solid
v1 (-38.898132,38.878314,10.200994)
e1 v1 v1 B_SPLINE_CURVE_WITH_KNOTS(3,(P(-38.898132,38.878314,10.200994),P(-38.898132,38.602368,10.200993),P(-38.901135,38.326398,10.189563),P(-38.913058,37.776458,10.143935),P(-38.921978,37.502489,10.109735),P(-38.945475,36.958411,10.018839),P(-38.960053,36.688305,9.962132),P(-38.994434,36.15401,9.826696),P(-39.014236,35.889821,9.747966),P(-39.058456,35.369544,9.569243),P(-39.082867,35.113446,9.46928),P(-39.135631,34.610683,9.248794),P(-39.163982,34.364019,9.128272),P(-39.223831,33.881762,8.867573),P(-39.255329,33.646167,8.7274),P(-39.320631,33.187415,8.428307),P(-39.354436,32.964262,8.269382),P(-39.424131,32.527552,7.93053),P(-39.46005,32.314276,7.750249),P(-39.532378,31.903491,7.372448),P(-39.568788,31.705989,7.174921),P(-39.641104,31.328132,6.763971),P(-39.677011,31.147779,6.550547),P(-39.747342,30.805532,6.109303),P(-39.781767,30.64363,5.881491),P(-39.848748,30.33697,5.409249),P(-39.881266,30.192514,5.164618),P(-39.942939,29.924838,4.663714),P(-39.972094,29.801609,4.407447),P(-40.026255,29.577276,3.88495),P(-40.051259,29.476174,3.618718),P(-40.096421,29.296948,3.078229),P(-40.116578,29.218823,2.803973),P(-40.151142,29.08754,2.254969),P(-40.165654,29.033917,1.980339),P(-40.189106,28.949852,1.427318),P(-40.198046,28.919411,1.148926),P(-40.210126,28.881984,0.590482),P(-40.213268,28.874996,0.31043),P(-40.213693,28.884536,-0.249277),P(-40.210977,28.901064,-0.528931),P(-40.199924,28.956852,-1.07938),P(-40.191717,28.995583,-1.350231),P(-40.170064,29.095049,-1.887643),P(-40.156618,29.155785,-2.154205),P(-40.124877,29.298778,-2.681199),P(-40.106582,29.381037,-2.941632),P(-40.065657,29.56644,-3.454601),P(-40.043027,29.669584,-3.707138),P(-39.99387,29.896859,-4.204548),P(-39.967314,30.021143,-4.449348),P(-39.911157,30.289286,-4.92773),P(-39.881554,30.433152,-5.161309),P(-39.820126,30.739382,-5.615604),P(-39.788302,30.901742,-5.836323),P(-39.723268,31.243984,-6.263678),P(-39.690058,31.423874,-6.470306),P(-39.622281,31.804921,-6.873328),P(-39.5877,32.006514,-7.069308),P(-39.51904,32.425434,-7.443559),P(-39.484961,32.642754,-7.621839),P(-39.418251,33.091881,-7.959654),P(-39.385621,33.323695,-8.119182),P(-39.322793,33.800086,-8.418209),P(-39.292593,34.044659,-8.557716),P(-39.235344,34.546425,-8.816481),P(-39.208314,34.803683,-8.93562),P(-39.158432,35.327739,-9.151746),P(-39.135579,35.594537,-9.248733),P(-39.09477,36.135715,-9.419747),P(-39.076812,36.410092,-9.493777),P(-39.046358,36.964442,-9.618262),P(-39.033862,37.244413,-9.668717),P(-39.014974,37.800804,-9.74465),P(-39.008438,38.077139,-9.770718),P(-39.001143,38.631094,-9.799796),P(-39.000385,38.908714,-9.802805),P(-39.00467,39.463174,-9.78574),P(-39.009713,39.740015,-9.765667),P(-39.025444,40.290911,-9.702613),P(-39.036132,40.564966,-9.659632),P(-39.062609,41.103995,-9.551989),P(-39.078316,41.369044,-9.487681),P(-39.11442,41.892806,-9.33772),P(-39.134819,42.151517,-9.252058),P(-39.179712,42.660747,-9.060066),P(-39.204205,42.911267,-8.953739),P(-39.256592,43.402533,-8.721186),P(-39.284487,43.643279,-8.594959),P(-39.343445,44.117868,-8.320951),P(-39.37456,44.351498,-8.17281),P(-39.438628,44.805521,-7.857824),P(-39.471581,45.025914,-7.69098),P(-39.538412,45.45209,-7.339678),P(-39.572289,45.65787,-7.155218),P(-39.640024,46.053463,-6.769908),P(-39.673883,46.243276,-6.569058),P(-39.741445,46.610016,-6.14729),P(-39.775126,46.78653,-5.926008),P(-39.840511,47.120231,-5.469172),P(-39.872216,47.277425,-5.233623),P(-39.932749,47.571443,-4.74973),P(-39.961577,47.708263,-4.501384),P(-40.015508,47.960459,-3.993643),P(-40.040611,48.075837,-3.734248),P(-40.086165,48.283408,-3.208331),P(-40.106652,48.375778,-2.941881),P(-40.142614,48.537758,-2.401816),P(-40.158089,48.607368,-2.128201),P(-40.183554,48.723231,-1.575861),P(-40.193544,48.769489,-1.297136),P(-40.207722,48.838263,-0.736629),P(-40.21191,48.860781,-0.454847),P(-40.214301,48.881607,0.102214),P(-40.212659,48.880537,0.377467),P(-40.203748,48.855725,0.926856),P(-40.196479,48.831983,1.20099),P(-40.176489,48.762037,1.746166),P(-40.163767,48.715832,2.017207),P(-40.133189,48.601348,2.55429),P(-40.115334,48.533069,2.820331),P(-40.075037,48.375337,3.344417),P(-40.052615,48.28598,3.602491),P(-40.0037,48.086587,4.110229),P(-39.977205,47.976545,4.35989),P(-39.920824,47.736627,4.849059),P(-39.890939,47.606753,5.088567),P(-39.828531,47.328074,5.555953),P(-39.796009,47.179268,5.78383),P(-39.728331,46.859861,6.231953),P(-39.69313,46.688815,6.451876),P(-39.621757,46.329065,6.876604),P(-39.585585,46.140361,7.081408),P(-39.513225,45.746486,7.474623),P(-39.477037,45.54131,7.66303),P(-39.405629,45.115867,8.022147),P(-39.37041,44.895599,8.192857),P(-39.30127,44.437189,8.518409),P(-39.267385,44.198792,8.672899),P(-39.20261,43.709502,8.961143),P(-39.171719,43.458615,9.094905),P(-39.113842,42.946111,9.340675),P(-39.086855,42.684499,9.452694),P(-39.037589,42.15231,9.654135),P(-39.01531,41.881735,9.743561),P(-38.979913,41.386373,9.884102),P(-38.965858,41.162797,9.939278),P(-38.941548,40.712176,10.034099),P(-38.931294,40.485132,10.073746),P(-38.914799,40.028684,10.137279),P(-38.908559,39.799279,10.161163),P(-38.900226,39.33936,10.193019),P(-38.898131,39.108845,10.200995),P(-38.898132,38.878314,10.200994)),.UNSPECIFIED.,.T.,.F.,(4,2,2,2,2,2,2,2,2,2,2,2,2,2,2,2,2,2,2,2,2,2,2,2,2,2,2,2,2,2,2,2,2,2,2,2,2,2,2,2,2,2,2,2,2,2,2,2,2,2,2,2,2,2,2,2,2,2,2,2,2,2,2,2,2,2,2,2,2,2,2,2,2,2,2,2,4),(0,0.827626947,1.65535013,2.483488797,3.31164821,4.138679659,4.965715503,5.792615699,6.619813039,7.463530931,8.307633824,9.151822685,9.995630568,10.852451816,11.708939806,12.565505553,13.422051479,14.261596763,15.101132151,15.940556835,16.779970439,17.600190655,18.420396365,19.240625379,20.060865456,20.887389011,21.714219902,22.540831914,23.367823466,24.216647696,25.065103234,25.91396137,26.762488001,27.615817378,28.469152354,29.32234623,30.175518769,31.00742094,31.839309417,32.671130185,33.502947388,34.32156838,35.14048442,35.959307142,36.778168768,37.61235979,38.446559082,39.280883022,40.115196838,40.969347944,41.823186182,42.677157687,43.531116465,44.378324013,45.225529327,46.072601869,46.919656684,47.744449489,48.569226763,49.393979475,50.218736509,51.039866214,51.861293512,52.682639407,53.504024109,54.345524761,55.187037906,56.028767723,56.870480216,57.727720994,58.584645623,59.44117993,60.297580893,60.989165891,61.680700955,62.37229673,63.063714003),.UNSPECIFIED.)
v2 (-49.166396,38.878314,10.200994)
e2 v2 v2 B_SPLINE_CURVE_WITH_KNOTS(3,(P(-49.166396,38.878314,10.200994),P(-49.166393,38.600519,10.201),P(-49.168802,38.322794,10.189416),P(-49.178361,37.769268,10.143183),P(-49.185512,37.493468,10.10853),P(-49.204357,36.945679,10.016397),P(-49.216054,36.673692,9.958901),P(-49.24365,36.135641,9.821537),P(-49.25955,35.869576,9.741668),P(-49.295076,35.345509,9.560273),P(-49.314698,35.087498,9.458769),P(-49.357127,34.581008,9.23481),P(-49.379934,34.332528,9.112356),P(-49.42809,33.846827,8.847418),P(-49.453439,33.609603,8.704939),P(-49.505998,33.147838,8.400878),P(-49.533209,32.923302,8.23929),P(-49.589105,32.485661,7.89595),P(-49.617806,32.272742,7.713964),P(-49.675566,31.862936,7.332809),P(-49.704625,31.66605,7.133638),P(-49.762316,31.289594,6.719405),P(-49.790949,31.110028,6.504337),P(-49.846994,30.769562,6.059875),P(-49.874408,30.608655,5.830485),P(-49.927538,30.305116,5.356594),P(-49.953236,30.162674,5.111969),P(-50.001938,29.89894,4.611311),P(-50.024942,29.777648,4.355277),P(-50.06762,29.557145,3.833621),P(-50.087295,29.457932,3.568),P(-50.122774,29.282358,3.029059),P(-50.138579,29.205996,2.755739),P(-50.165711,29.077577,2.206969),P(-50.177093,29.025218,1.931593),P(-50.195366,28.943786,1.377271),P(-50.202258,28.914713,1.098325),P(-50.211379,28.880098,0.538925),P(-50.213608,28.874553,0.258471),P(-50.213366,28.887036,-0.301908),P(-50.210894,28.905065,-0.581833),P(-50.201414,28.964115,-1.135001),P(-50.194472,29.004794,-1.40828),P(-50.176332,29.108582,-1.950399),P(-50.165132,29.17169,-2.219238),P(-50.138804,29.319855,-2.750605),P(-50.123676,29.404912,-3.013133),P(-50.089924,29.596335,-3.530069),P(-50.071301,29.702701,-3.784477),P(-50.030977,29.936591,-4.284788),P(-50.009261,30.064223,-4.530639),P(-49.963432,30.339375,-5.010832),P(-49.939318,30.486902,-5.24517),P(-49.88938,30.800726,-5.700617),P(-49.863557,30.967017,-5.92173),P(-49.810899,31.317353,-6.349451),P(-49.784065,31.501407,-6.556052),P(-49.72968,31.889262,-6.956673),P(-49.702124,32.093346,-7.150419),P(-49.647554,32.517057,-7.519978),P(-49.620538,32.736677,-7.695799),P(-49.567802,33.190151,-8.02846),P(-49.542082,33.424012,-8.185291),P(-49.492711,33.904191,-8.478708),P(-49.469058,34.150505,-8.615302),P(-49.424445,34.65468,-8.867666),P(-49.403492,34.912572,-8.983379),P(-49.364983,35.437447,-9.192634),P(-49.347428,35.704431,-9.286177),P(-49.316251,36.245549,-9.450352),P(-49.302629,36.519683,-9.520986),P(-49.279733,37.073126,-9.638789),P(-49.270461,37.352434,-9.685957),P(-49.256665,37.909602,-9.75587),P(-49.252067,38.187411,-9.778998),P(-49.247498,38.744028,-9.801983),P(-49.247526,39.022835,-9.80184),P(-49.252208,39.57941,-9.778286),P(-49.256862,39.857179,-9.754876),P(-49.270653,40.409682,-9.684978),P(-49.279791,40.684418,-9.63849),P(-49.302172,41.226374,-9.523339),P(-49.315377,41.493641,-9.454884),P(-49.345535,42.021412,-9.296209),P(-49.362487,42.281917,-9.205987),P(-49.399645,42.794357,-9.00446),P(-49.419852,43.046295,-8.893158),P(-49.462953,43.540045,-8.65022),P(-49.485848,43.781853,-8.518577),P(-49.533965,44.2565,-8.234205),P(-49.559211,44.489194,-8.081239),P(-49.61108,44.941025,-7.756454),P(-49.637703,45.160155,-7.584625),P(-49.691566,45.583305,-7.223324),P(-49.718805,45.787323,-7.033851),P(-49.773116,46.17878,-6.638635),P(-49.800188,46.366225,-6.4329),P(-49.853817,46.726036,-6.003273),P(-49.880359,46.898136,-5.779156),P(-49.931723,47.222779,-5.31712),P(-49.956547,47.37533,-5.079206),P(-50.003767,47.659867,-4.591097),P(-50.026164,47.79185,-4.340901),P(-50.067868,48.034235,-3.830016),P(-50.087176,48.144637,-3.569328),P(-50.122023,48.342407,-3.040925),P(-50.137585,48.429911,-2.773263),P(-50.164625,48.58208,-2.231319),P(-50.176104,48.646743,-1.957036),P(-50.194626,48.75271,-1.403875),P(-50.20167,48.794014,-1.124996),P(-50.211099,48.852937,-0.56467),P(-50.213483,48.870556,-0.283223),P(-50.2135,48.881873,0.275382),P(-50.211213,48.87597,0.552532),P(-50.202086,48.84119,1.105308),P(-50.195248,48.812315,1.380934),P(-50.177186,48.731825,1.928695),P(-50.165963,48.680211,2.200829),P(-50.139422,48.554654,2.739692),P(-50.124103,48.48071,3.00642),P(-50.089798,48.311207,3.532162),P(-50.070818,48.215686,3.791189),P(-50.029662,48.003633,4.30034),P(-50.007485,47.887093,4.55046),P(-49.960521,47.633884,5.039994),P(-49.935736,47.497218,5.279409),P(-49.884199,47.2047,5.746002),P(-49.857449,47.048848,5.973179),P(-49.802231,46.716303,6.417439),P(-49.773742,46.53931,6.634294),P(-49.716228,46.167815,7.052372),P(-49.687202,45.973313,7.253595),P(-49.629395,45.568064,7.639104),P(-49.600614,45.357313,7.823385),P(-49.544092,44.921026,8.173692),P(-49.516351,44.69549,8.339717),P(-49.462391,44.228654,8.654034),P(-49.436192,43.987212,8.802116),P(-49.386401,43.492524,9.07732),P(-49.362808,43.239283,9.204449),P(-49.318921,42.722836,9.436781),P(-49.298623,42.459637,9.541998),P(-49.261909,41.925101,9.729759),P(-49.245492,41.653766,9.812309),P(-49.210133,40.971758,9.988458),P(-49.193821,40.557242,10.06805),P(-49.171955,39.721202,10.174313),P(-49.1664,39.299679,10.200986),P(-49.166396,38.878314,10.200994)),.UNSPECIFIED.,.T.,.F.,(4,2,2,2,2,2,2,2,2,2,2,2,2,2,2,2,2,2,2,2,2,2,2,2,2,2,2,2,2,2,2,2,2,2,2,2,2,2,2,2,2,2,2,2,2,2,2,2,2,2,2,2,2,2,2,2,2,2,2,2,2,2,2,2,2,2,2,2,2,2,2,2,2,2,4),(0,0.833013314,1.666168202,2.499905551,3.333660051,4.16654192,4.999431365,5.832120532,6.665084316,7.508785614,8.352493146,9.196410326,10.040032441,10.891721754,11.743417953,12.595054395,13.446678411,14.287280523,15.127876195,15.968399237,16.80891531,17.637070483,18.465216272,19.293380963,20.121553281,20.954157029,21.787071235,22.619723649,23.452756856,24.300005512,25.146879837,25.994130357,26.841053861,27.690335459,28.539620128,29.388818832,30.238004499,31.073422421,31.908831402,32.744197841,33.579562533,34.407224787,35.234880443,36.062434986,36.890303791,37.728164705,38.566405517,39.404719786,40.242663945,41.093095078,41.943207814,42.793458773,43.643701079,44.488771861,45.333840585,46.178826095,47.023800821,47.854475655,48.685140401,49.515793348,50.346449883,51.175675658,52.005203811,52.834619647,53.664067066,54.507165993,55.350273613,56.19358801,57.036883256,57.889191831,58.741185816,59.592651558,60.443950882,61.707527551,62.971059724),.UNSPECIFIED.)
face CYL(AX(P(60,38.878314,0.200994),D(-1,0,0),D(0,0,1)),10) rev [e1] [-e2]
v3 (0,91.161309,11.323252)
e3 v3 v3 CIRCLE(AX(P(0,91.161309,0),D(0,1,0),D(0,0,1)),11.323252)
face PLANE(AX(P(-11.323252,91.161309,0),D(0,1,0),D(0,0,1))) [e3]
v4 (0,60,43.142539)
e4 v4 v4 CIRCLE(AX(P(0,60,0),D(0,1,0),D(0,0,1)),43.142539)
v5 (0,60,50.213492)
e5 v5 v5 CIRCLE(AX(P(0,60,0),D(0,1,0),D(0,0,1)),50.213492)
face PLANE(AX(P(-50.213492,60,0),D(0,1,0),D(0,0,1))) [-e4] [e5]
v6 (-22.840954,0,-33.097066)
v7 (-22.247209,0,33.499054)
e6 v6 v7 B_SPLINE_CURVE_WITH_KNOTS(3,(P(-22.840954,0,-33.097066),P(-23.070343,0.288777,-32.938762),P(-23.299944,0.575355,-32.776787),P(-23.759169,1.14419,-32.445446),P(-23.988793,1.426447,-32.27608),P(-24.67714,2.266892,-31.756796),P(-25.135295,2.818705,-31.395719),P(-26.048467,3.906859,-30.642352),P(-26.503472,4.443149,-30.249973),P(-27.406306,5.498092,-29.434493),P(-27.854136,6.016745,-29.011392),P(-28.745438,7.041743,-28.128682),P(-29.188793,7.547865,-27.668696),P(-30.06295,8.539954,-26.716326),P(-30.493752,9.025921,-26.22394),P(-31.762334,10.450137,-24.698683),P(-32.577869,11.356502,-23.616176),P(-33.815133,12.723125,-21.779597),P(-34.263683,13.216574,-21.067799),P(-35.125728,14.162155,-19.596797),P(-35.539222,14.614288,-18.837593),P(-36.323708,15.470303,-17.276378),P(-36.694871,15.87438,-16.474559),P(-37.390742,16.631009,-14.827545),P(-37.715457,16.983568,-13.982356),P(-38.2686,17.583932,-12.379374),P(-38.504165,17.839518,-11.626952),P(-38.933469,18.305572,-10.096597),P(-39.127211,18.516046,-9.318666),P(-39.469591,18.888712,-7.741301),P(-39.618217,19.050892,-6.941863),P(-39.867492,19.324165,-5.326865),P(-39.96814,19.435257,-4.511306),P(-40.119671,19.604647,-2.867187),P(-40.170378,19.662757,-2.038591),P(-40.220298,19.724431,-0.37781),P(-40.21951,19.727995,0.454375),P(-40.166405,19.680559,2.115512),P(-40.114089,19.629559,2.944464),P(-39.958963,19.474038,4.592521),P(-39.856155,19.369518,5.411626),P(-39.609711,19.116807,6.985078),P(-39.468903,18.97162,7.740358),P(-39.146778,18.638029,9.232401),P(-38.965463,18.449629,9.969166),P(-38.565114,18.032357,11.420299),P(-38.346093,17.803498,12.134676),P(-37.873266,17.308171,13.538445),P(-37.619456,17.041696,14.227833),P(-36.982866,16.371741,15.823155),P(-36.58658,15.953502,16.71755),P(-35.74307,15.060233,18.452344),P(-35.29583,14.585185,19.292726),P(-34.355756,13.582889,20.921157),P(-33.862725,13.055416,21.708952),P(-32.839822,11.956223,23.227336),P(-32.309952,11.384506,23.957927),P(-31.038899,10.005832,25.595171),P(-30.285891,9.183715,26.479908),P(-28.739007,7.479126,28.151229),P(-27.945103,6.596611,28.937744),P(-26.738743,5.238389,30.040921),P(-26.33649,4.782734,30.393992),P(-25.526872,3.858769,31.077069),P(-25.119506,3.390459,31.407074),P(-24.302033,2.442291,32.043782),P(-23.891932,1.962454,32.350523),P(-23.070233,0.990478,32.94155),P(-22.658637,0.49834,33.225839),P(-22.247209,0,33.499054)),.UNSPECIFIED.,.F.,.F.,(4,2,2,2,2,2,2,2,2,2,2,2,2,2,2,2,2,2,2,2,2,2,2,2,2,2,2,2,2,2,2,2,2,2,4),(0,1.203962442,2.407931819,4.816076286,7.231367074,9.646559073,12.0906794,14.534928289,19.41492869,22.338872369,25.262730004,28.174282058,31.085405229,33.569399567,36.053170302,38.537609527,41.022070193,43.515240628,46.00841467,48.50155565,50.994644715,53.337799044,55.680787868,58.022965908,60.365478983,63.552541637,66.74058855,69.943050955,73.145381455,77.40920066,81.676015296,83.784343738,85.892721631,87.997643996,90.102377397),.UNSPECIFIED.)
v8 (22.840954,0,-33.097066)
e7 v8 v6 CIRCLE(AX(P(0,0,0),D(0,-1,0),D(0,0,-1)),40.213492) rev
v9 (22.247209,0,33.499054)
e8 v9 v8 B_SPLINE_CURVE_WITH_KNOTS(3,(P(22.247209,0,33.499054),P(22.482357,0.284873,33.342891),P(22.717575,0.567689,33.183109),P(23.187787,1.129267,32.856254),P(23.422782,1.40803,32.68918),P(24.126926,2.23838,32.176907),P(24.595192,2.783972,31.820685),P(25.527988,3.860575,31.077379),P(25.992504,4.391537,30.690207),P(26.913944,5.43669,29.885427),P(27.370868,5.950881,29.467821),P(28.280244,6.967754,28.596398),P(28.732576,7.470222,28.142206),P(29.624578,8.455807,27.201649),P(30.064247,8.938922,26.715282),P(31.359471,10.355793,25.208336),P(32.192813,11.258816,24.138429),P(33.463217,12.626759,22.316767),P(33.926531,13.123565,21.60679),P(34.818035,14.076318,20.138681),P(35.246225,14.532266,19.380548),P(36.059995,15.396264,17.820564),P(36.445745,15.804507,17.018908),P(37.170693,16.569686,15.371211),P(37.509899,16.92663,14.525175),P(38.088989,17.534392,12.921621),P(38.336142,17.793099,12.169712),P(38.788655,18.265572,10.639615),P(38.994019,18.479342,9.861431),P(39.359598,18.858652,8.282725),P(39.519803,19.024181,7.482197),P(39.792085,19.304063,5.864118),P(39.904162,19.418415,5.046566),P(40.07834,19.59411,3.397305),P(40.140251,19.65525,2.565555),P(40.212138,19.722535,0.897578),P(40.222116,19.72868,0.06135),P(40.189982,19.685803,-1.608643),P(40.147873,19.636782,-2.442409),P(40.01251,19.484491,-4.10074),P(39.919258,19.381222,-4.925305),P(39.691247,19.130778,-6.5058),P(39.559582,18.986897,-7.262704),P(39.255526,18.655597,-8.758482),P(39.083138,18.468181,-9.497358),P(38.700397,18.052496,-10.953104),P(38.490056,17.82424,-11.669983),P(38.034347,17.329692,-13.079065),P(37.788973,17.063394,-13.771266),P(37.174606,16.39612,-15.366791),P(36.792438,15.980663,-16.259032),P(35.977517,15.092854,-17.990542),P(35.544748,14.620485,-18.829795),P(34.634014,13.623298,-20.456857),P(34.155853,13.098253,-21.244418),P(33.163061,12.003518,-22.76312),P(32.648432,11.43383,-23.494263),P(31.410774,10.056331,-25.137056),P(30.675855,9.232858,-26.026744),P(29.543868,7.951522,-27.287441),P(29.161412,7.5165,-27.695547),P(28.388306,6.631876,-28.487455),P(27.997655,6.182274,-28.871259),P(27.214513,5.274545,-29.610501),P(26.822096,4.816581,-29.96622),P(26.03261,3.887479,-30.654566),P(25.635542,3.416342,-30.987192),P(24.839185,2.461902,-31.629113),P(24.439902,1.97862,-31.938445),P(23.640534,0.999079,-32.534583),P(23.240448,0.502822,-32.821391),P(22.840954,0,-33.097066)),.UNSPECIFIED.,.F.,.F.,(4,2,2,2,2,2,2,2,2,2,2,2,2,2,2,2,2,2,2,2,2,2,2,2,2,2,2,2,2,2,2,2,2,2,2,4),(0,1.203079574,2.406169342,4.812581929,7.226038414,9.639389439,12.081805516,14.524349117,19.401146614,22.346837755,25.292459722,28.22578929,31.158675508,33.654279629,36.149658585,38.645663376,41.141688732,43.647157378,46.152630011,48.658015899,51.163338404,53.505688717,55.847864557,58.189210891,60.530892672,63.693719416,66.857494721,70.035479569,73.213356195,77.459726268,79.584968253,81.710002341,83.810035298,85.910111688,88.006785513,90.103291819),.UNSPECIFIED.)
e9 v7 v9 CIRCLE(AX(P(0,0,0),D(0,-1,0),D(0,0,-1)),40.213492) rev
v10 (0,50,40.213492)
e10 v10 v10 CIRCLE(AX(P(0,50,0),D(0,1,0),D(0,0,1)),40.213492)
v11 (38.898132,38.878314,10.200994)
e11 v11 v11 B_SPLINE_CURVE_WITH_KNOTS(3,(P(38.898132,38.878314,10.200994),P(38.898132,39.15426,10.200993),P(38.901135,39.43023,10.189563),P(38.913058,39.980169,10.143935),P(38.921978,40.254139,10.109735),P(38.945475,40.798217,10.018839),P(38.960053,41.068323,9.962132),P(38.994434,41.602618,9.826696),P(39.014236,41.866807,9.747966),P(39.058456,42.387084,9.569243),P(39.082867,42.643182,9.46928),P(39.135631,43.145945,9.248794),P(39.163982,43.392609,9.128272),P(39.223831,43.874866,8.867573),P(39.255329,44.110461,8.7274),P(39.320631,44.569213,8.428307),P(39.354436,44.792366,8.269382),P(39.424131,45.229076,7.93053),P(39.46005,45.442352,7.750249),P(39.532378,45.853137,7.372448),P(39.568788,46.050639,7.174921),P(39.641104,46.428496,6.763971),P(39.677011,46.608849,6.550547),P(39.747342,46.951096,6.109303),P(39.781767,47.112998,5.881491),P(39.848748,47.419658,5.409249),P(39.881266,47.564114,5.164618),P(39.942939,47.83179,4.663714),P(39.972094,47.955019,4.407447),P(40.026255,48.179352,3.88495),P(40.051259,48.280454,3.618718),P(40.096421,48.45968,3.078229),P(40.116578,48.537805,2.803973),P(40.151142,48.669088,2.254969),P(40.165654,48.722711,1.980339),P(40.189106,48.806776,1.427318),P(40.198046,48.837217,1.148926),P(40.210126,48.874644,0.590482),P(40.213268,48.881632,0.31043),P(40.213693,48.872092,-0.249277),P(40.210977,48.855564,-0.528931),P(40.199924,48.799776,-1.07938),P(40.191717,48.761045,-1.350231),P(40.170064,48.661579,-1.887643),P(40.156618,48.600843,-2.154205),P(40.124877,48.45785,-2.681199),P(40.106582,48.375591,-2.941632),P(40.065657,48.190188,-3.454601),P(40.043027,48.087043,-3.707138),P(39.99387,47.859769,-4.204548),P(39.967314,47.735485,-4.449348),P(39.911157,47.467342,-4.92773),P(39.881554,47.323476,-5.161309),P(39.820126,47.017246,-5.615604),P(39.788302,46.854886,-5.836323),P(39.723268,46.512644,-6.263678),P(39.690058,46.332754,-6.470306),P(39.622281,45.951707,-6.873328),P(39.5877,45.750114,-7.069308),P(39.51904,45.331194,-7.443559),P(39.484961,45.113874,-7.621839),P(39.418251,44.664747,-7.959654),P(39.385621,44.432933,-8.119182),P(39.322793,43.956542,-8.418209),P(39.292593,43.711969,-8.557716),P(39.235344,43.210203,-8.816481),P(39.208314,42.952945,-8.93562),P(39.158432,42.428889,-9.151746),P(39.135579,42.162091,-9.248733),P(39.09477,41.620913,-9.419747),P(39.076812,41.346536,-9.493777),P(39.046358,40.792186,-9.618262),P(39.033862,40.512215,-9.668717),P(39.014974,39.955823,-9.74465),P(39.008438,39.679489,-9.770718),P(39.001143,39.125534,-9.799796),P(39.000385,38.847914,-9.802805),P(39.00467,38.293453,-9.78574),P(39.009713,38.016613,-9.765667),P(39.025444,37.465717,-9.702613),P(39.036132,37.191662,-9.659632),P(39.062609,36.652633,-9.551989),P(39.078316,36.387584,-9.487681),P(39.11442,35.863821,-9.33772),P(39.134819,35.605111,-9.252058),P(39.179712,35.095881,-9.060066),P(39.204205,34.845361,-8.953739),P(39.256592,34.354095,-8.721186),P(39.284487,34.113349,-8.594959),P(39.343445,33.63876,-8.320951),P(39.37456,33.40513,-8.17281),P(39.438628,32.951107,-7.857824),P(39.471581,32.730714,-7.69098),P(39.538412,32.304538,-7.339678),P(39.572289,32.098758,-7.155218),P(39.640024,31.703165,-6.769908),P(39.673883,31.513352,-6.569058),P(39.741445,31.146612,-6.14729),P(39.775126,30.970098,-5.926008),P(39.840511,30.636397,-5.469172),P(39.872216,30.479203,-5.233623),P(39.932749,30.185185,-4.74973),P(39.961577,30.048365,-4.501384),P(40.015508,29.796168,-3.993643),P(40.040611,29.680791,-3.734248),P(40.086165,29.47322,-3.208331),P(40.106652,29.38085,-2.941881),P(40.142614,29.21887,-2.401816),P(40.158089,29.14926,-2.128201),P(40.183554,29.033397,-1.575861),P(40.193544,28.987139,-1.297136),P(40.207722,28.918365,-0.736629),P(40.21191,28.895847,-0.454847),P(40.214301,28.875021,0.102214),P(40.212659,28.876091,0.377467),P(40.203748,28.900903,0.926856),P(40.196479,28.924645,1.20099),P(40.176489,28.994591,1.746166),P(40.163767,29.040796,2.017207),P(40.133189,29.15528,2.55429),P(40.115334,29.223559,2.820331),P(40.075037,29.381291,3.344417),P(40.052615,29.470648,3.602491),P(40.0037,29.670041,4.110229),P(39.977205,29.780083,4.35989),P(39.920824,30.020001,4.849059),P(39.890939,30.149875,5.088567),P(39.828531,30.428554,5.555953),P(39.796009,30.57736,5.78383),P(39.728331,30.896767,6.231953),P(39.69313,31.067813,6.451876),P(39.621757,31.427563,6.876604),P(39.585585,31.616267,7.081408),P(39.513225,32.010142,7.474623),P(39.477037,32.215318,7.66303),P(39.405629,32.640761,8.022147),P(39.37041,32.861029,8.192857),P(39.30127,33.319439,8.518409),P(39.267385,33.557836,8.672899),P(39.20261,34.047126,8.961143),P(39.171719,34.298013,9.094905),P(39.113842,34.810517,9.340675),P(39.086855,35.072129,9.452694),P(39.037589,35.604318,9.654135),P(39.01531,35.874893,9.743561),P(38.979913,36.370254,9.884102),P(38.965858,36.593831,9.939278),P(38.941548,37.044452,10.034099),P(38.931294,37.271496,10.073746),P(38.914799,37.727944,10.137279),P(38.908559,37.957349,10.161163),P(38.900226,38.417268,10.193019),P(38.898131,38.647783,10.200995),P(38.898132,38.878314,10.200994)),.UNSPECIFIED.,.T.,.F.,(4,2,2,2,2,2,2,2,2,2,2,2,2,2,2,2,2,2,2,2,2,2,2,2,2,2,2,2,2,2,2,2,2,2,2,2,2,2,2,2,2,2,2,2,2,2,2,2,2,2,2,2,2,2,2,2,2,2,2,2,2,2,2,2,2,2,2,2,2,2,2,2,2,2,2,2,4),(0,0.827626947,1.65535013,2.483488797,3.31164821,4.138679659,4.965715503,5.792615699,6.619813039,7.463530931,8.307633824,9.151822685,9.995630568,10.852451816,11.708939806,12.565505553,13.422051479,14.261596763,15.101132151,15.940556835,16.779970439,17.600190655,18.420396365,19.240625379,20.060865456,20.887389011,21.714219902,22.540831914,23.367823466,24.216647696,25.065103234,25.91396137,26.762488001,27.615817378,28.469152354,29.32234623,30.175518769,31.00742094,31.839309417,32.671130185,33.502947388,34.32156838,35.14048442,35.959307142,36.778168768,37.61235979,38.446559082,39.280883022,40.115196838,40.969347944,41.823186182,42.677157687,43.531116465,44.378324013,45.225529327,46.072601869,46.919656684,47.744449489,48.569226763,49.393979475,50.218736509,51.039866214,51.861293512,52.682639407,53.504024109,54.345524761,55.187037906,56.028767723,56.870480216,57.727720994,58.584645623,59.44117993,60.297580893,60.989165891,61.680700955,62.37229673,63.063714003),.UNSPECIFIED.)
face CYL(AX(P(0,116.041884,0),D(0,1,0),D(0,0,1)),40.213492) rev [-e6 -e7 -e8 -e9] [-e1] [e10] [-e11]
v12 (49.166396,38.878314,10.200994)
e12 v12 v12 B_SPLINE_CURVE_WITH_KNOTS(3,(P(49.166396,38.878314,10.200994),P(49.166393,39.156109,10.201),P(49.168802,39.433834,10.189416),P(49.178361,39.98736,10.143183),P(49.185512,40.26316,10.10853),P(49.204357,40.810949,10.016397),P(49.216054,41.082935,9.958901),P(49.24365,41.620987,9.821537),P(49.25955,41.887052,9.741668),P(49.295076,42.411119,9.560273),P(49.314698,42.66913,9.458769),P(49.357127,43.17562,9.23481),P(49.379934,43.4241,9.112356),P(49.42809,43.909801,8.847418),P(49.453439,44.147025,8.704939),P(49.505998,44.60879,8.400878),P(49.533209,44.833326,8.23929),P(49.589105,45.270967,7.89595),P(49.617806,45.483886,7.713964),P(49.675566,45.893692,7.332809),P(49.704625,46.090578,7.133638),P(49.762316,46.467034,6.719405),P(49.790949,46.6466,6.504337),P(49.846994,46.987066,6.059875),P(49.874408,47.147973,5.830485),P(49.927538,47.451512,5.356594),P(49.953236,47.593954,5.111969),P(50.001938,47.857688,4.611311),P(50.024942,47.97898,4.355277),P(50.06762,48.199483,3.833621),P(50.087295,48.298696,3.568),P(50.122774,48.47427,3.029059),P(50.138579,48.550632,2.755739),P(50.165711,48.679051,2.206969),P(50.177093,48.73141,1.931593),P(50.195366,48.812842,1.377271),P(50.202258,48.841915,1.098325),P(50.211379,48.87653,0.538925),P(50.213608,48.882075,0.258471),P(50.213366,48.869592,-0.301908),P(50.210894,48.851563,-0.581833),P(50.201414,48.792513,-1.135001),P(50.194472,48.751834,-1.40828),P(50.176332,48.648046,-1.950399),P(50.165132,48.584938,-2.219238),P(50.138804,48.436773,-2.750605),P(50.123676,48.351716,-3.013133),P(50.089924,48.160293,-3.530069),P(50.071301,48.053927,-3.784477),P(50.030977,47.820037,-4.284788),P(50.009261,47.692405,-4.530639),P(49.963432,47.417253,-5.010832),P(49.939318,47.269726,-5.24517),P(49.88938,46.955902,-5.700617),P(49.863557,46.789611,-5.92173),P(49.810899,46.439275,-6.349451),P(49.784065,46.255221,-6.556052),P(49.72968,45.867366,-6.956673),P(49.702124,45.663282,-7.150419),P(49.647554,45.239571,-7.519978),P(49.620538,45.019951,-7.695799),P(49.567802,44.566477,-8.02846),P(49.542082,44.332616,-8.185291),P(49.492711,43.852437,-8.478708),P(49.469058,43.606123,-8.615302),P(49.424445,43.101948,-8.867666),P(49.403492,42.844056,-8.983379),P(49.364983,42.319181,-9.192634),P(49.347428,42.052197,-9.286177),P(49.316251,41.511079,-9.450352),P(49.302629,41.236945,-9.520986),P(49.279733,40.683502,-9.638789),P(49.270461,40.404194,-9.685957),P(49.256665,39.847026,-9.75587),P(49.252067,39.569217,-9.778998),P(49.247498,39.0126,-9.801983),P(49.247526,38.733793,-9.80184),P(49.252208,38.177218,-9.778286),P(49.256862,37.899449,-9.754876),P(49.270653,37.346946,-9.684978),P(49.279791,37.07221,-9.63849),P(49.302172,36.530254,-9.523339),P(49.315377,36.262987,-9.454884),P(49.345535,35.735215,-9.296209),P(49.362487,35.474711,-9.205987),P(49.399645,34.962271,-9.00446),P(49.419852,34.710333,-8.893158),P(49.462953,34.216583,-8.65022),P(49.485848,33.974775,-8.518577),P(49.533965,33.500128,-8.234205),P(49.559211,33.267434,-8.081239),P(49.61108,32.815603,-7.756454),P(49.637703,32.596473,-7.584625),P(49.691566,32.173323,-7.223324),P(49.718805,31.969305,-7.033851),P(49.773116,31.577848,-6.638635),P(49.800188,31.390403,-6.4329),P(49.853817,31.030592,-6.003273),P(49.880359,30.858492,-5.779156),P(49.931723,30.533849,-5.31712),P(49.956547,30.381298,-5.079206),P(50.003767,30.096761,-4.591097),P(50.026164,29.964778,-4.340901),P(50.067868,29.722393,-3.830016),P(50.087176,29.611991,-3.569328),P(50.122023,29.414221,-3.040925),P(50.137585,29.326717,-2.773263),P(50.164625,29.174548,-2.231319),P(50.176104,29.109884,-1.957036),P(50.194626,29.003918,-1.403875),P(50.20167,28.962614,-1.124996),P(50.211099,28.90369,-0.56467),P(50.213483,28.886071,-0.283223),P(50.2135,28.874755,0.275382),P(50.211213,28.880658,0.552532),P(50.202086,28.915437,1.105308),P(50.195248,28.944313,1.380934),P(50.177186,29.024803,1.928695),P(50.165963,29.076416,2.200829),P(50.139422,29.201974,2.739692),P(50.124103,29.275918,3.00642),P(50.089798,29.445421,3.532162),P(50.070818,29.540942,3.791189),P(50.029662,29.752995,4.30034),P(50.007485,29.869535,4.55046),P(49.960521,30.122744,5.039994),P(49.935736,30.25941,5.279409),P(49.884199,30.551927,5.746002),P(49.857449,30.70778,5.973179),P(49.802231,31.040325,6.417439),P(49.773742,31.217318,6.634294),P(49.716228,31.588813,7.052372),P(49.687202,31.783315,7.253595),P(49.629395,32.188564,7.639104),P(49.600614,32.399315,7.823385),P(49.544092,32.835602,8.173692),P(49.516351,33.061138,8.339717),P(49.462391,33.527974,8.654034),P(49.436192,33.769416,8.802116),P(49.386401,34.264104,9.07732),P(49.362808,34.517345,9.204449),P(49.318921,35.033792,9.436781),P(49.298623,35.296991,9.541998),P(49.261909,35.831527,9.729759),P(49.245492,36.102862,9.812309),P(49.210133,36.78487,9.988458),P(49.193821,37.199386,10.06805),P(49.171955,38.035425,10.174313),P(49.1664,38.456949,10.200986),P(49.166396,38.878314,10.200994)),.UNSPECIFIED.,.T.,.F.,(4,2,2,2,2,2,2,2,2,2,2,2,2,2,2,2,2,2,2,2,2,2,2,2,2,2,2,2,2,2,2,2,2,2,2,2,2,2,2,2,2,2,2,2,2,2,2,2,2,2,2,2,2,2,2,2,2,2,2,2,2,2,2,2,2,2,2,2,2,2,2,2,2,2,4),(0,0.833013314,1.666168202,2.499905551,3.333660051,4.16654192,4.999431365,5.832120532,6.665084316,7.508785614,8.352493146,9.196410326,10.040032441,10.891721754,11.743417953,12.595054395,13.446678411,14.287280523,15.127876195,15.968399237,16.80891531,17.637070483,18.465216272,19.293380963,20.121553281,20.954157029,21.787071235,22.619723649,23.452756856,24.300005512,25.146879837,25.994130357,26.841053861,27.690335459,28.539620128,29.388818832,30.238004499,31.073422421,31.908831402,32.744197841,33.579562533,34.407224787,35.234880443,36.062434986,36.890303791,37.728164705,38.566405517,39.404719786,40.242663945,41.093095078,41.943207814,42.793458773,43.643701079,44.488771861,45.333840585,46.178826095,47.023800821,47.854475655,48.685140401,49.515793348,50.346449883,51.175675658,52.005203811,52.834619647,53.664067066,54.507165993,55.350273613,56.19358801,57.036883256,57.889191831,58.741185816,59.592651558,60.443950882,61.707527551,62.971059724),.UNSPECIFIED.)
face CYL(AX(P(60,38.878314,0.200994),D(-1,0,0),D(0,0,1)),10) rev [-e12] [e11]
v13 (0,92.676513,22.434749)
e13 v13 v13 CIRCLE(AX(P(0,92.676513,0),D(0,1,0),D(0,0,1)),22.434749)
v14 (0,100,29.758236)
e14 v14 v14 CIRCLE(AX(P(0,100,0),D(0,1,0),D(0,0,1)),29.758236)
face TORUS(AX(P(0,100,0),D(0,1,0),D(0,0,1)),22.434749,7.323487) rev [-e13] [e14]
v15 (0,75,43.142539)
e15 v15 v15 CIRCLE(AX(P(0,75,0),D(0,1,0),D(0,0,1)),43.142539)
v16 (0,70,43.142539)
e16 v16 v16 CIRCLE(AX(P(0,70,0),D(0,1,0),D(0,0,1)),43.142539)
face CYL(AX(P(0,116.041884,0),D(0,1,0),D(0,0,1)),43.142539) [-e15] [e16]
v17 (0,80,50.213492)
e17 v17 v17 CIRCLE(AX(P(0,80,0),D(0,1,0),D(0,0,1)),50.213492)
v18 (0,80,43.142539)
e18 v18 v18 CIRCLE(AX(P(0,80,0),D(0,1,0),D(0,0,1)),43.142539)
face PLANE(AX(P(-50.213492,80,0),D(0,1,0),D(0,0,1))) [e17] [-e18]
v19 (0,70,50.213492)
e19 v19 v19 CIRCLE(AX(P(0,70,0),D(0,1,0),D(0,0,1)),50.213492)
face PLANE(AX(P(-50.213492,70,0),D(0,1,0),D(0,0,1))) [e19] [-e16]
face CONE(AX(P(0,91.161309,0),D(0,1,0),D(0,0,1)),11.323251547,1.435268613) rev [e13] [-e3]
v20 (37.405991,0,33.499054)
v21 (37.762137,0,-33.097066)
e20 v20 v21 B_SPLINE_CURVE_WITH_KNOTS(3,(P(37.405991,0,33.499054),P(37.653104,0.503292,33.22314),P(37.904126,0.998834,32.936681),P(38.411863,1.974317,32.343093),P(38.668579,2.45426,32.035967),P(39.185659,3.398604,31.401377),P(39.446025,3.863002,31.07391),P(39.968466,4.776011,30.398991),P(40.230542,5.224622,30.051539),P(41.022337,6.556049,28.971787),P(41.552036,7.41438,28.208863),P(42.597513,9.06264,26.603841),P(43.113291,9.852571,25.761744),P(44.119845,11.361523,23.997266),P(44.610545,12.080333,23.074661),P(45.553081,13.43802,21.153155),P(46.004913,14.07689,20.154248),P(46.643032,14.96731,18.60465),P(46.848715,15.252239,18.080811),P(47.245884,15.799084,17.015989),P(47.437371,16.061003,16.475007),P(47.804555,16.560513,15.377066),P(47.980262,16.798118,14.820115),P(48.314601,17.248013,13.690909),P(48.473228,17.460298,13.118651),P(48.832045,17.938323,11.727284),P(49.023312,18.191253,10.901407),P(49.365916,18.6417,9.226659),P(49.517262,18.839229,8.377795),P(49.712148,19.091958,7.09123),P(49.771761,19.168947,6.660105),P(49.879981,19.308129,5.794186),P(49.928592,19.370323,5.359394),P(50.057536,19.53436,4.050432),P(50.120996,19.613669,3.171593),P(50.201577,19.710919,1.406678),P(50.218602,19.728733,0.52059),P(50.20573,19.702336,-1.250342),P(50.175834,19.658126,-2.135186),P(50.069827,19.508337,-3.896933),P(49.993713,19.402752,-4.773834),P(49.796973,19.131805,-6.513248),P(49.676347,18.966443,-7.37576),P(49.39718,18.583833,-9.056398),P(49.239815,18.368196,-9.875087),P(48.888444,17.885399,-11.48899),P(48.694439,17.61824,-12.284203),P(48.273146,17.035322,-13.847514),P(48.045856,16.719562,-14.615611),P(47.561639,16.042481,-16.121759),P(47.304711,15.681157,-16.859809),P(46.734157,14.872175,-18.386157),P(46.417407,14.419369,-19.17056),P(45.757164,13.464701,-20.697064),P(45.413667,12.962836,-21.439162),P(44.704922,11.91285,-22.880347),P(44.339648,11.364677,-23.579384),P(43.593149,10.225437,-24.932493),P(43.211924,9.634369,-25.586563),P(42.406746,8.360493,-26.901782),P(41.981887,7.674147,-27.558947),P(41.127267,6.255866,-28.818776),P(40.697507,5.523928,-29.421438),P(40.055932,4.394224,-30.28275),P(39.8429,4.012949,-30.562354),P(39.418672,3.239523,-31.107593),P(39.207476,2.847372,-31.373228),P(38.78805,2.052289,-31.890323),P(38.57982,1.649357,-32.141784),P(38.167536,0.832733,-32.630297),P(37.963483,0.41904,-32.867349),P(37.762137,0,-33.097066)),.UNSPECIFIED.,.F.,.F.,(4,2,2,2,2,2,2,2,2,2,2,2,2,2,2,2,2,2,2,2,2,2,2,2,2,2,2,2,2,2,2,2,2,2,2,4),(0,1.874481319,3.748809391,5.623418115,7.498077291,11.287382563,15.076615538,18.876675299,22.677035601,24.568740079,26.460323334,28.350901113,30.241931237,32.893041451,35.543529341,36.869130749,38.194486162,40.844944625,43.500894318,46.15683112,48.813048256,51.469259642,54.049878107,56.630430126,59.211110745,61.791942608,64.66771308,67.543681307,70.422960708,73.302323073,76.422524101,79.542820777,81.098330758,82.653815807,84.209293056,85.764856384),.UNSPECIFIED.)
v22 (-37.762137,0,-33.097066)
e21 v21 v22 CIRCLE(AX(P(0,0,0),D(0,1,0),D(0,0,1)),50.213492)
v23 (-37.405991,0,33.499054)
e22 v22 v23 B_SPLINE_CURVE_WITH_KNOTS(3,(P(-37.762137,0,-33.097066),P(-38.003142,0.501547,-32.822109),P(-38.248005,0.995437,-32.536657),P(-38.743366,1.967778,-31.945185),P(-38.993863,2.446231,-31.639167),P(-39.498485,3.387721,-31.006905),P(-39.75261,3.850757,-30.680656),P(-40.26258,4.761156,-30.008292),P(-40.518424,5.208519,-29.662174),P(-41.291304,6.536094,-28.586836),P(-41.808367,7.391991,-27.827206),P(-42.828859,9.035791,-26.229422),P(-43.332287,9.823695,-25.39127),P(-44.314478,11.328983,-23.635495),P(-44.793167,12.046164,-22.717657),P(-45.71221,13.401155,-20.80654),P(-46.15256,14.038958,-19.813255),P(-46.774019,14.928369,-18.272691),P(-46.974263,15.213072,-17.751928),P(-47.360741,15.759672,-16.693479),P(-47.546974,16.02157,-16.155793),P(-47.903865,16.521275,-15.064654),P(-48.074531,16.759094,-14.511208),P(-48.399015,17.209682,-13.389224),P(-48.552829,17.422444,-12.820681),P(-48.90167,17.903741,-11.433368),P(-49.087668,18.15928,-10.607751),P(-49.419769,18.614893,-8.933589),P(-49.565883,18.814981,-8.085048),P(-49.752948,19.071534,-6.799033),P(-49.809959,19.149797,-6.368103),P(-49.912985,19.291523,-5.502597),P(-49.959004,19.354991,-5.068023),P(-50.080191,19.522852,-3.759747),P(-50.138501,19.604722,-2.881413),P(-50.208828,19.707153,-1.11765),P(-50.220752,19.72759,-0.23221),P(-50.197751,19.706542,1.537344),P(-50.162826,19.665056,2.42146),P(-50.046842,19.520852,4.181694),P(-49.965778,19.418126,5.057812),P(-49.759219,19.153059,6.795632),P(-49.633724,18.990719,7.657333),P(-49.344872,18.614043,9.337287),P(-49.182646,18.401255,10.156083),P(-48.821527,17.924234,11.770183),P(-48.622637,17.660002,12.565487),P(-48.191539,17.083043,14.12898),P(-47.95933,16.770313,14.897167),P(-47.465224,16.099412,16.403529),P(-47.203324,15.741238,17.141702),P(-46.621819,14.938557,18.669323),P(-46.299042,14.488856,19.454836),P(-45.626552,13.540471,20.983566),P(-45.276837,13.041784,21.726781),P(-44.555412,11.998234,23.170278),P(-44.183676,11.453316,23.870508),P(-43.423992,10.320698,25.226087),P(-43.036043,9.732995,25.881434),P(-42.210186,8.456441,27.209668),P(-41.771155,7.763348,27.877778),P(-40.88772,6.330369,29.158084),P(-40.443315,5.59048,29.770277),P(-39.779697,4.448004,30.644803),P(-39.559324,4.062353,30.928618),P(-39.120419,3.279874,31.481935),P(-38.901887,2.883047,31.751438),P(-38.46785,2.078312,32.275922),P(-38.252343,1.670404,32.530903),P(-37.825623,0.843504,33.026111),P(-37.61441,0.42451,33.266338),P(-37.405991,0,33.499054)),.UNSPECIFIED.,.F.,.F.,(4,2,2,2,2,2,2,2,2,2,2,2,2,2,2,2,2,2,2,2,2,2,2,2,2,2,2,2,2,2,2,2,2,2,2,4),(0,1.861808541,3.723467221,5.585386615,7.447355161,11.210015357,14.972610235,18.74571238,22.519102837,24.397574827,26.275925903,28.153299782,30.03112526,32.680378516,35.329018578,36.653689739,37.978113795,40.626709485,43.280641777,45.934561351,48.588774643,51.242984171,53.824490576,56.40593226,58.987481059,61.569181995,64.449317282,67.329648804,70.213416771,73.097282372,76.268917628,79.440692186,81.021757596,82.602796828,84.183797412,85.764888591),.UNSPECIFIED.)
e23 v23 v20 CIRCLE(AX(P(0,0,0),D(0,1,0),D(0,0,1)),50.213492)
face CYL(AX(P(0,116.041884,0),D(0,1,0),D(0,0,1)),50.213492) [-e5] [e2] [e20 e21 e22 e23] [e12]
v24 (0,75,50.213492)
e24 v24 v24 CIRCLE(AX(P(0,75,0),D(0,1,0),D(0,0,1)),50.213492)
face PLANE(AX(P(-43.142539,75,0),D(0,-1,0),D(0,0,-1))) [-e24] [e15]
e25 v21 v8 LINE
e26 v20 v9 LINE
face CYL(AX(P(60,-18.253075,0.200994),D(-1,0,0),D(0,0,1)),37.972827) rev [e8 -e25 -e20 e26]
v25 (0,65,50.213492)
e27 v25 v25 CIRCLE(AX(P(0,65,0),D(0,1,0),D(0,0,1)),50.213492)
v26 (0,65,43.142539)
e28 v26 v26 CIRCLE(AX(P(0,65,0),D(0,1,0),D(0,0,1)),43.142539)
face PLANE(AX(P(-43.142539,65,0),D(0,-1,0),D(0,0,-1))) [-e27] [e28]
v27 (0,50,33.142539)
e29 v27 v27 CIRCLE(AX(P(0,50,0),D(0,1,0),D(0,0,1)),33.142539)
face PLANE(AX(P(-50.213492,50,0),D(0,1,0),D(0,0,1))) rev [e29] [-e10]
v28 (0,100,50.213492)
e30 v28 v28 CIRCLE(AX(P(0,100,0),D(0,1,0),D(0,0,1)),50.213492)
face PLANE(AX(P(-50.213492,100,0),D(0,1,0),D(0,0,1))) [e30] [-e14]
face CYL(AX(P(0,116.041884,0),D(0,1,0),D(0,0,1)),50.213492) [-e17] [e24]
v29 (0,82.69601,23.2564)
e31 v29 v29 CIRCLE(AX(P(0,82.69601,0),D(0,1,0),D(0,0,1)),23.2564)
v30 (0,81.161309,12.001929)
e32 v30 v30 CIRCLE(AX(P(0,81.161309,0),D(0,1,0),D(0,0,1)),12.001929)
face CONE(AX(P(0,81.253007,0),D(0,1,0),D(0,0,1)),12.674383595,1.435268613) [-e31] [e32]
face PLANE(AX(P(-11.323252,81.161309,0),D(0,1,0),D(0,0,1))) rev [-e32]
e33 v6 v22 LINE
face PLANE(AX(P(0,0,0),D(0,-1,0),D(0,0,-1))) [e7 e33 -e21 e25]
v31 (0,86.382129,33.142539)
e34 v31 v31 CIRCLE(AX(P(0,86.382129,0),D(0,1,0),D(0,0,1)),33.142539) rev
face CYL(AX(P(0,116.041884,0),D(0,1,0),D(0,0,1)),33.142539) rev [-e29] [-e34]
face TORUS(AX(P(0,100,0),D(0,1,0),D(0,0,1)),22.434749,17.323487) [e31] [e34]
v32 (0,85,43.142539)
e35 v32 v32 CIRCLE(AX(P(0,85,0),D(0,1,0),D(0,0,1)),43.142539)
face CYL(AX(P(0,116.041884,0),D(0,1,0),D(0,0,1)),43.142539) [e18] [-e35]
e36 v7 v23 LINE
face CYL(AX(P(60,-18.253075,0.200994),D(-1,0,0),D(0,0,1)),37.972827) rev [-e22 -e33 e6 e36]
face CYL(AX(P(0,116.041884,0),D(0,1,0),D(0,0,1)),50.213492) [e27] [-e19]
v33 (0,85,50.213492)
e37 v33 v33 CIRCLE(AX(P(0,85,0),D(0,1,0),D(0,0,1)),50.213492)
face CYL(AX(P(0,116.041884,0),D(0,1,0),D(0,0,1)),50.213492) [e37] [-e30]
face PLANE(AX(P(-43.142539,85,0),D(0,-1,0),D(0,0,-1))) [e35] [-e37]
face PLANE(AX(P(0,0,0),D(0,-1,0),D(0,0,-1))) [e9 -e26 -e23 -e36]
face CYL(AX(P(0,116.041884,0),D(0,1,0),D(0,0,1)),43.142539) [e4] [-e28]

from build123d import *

# Parameters (mm, degrees)
CUT_EXTRUDE1_DEPTH      = 60
CUT_EXTRUDE1_DEPTH_BACK = 60
SKETCH2_R               = 10


with BuildPart() as part:
    # Sketch1 → Revolve1 (revolve)
    with BuildSketch(Plane.XY, mode=Mode.PRIVATE) as revolve1_sk:
        with BuildLine():
            Line((-50.213491879, 0), (-50.213491879, 60))
            Line((-50.213491879, 60), (-43.142539091, 60))
            Line((-43.142539091, 60), (-43.142539091, 65))
            Line((-43.142539091, 65), (-50.213491879, 65))
            Line((-50.213491879, 65), (-50.213491879, 70))
            Line((-50.213491879, 70), (-43.142539091, 70))
            Line((-43.142539091, 70), (-43.142539091, 75))
            Line((-43.142539091, 75), (-50.213491879, 75))
            Line((-50.213491879, 75), (-50.213491879, 80))
            Line((-50.213491879, 80), (-43.142539091, 80))
            Line((-43.142539091, 80), (-43.142539091, 85))
            Line((-43.142539091, 85), (-50.213491879, 85))
            Line((-50.213491879, 85), (-50.213491879, 100))
            Line((-50.213491879, 100), (-29.758235601, 100))
            ThreePointArc((-29.758235601, 100), (-27.613235974, 94.821512811), (-22.434748785, 92.676513184))
            Line((-22.434748785, 92.676513184), (-11.323251547, 91.161309016))
            Line((-11.323251547, 91.161309016), (0, 91.161309016))
            Line((0, 91.161309016), (0, 0))
            Line((0, 0), (-50.213491879, 0))
        make_face()
    revolve(revolve1_sk.sketch.rotate(Axis((0, 116.04188361, 0), (0, -1, 0)), 270), axis=Axis((0, 116.04188361, 0), (0, -1, 0)))

    # Shell1: read off the stored shape, not the designer's step
    # Shell1 outline → Shell1 (revolve, cut)
    with BuildSketch(Plane.XY):
        with BuildLine():
            Line((12.001929251, 81.161309016), (0, 81.161309016))
            Line((0, 81.161309016), (0, 0))
            Line((0, 0), (40.213491879, 0))
            Line((40.213491879, 0), (40.213491879, 50))
            Line((40.213491879, 50), (33.142539091, 50))
            Line((33.142539091, 50), (33.142539091, 86.382128573))
            ThreePointArc((33.142539091, 86.382128573), (28.486928042, 83.768107883), (23.256399997, 82.696009572))
            Line((23.256399997, 82.696009572), (12.001929251, 81.161309016))
        make_face()
    revolve(axis=Axis((0, 0, 0), (0, 1, 0)), mode=Mode.SUBTRACT)

    # Sketch2 → Cut-Extrude1 (cut, two sides: drawn at the far end of the back side and taken through both)
    with BuildSketch(Plane(origin=(0, 0, 0), x_dir=(0, 0, -1), z_dir=(1, 0, 0)).offset(-CUT_EXTRUDE1_DEPTH_BACK)):
        with Locations(Location((-0.200994326, 38.878313976, 0), (0, 0, 180))):
            Circle(SKETCH2_R)
        with BuildLine():
            Line((-33.49905429, 0), (33.097065639, 0))
            ThreePointArc((33.097065639, 0), (-0.200994326, 19.719751163), (-33.49905429, 0))
        make_face()
    extrude(amount=CUT_EXTRUDE1_DEPTH + CUT_EXTRUDE1_DEPTH_BACK, mode=Mode.SUBTRACT)


solid = part.part
